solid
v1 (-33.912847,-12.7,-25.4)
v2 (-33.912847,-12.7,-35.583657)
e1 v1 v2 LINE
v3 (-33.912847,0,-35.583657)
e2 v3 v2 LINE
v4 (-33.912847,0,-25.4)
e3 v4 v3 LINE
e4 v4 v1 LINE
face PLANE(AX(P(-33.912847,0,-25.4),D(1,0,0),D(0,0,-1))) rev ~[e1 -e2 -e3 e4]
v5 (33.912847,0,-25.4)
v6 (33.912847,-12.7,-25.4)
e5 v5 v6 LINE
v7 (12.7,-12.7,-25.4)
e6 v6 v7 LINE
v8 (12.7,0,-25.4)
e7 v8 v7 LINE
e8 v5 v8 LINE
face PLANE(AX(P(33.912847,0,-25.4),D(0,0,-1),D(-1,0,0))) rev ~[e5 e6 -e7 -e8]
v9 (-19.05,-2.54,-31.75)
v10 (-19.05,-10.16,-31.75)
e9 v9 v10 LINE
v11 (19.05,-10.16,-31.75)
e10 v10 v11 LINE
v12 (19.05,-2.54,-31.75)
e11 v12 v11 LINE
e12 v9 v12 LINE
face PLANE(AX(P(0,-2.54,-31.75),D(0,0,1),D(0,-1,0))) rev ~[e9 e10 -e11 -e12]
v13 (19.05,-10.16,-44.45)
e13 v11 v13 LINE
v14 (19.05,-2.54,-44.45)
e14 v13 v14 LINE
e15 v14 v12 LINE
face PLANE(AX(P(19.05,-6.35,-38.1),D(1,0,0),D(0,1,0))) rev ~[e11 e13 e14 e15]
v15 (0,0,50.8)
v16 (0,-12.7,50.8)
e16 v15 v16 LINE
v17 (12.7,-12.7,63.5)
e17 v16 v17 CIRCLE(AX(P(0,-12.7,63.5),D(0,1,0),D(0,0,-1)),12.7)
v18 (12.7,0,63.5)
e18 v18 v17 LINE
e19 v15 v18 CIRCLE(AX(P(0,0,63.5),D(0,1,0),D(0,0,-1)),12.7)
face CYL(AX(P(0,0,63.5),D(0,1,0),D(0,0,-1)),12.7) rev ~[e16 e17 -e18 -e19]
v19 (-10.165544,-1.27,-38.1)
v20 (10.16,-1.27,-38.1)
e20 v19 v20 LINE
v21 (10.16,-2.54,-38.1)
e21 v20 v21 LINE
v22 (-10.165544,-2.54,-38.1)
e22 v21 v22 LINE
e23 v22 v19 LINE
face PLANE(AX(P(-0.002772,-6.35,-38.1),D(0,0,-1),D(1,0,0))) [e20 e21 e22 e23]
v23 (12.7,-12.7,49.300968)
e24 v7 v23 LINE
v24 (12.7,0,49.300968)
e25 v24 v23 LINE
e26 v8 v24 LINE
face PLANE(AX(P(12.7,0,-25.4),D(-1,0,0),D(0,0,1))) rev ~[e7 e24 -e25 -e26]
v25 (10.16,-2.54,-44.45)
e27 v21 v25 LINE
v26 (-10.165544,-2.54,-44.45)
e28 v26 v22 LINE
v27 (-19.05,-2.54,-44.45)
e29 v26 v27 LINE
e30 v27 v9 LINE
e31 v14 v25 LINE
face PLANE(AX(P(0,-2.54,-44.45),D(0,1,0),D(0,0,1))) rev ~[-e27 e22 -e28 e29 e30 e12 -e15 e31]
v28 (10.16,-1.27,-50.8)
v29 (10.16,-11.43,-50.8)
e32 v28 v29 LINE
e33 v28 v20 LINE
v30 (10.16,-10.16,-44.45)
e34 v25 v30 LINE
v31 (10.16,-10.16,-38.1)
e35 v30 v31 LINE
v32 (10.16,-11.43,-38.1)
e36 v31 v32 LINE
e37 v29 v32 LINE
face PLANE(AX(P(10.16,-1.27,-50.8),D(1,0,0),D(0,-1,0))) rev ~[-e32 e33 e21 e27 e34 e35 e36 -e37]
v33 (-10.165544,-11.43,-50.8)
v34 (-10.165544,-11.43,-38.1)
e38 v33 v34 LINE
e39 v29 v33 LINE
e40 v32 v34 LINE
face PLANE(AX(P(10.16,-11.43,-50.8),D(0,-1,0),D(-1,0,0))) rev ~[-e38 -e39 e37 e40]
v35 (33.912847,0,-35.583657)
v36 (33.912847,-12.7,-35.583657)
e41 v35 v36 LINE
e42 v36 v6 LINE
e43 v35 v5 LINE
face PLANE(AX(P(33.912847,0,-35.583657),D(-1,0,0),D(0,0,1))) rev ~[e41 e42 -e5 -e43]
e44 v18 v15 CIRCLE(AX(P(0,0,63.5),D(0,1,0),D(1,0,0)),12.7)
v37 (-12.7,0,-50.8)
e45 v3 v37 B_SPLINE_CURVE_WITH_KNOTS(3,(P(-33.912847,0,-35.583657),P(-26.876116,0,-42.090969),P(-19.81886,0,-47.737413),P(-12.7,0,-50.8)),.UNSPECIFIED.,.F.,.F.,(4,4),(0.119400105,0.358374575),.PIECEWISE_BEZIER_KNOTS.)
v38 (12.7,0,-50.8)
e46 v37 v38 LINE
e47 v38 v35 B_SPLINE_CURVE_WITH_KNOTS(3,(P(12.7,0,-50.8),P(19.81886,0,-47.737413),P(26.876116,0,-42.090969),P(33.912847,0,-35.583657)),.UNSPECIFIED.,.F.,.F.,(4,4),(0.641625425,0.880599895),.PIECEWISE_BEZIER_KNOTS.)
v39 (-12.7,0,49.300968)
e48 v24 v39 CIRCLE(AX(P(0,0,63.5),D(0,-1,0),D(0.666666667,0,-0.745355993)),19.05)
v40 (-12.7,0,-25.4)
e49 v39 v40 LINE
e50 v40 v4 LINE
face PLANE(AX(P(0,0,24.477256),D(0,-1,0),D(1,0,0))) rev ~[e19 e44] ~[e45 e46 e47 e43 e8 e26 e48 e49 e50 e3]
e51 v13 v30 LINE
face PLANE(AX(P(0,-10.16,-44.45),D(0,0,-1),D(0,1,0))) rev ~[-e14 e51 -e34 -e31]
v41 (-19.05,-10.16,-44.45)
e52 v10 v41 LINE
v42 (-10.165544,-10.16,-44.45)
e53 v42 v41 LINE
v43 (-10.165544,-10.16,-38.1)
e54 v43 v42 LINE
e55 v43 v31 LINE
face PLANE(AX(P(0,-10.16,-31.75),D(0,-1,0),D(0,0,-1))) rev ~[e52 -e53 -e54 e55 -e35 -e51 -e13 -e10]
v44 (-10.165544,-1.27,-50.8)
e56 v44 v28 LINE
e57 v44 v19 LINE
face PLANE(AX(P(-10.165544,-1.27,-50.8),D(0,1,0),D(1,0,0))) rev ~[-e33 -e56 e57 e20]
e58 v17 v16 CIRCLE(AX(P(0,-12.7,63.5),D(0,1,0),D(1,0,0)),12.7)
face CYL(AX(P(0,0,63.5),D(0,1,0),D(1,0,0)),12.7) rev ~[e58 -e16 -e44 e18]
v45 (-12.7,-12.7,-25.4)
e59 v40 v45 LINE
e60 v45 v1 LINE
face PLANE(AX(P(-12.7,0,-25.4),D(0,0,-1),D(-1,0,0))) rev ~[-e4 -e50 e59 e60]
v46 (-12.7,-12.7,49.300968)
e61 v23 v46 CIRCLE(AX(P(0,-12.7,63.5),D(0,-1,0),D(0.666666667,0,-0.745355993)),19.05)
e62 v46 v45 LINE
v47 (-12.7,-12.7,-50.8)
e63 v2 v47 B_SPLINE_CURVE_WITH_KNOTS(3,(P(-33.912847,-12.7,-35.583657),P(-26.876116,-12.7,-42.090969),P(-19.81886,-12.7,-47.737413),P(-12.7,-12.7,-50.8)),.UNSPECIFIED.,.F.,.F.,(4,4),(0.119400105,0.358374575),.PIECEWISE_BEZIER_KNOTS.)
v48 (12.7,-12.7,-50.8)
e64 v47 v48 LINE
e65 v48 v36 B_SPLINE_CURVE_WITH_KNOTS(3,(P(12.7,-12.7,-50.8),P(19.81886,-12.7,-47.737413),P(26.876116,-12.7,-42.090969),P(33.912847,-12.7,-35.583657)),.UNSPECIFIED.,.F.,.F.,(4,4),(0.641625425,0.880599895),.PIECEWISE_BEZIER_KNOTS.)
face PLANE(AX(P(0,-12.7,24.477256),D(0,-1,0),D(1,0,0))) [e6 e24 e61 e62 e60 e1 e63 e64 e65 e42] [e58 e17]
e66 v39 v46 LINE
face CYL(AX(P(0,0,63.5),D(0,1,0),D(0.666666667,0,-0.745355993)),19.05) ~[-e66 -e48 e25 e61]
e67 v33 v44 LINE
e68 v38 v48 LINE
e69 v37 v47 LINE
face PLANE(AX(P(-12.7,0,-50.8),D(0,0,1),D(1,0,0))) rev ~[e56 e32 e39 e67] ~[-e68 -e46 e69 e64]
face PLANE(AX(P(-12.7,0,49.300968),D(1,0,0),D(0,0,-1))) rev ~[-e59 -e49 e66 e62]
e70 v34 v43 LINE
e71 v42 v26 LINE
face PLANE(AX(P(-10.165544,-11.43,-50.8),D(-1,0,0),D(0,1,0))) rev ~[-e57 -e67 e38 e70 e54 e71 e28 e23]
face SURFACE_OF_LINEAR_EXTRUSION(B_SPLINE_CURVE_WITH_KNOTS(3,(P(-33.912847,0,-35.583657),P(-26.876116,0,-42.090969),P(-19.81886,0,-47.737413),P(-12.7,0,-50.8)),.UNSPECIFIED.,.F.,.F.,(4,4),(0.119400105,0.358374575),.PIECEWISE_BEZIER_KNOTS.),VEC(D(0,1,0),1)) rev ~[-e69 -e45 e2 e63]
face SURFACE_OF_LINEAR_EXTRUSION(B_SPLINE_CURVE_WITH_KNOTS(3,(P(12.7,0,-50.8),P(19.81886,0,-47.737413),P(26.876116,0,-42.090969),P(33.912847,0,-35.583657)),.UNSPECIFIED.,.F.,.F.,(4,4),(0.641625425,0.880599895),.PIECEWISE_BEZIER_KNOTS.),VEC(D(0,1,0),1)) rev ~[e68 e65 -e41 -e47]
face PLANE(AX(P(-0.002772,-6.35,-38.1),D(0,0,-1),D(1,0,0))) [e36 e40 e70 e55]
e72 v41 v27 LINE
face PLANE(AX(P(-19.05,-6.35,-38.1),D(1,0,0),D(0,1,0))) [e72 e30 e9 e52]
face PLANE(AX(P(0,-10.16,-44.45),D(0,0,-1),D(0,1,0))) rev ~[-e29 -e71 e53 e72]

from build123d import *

# Parameters (mm, degrees)
F1_DEPTH      = 12.7
F3_DEPTH      = 19.05
F3_DEPTH_BACK = 19.05
F5_DEPTH      = 12.7


# Not quite as in the source:
# - a feature names something its author has since deleted; it is built from what else it names


with BuildPart() as f1:
    # F0 (on Front) → F1 (new body)
    with BuildSketch(Plane.XZ):
        with BuildLine():
            Line((-12.7, 0), (0, 0))
            Line((0, 0), (12.7, 0))
            Line((12.7, 0), (12.7, 49.3009683429))
            ThreePointArc((12.7, 49.3009683429), (0, 44.45), (-12.7, 49.3009683429))
            Line((-12.7, 49.3009683429), (-12.7, 0))
        make_face()
        Polygon((12.7, 0), (0, 0), (-12.7, 0), (-12.7, -25.4), (0, -25.4), (12.7, -25.4), align=None)
        with BuildLine():
            ThreePointArc((-12.7, 49.3009683429), (0, 44.45), (12.7, 49.3009683429))
            Line((12.7, 49.3009683429), (12.7, 50.8))
            Line((12.7, 50.8), (0, 50.8))
            Line((0, 50.8), (-12.7, 50.8))
            Line((-12.7, 50.8), (-12.7, 49.3009683429))
        make_face()
        with BuildLine():
            Line((12.7, 50.8), (12.7, 49.3009683429))
            ThreePointArc((12.7, 49.3009683429), (17.3901912008, 55.7228700667), (19.05, 63.5))
            ThreePointArc((19.05, 63.5), (13.4703841816, 76.9703841816), (0, 82.55))
            ThreePointArc((0, 82.55), (-17.7959834382, 70.2974608102), (-12.7, 49.3009683429))
            Line((-12.7, 49.3009683429), (-12.7, 50.8))
            Line((-12.7, 50.8), (0, 50.8))
            Line((0, 50.8), (12.7, 50.8))
        make_face()
        with BuildLine():
            ThreePointArc((12.7, 63.5), (8.9802561211, 54.5197438789), (0, 50.8))
            ThreePointArc((0, 50.8), (-8.9802561211, 72.4802561211), (12.7, 63.5))
        make_face(mode=Mode.SUBTRACT)
        with BuildLine():
            Line((33.9128470637, -25.4), (12.7, -25.4))
            Line((12.7, -25.4), (12.7, -50.8))
            add(Edge.make_bspline(
                [(12.7, -50.8), (19.8188597647, -47.7374133591), (26.8761157229, -42.0909685678), (33.9128470637, -35.5836565254)],
                knots=[0.6416254251, 0.6416254251, 0.6416254251, 0.6416254251, 0.8805998947, 0.8805998947, 0.8805998947, 0.8805998947], degree=3))
            Line((33.9128470637, -35.5836565254), (33.9128470637, -25.4))
        make_face()
        Polygon((12.7, -50.8), (12.7, -25.4), (0, -25.4), (-12.7, -25.4), (-12.7, -50.8), align=None)
        with BuildLine():
            Line((-12.7, -50.8), (-12.7, -25.4))
            Line((-12.7, -25.4), (-33.9128470637, -25.4))
            Line((-33.9128470637, -25.4), (-33.9128470637, -35.5836565254))
            add(Edge.make_bspline(
                [(-33.9128470637, -35.5836565254), (-26.8761157229, -42.0909685678), (-19.8188597647, -47.7374133591), (-12.7, -50.8)],
                knots=[0.1194001053, 0.1194001053, 0.1194001053, 0.1194001053, 0.3583745749, 0.3583745749, 0.3583745749, 0.3583745749], degree=3))
        make_face()
    extrude(amount=F1_DEPTH)

    # F2 (on Right) → F3 (cut, two sides)
    with BuildSketch(Plane.YZ) as f3_sk:
        Polygon((-7.62, -31.75), (-10.16, -31.75), (-10.16, -44.45), (-5.08, -44.45), (-2.54, -44.45), (-2.54, -31.75), (-5.08, -31.75), align=None)
    extrude(amount=-F3_DEPTH, mode=Mode.SUBTRACT)
    extrude(f3_sk.sketch, amount=F3_DEPTH_BACK, mode=Mode.SUBTRACT)

    # F4 (on face) → F5 (cut)
    with BuildSketch(Plane(origin=(0, 0, -50.8), x_dir=(1, 0, 0), z_dir=(0, 0, -1))):
        Polygon((-10.1655442268, 1.27), (0, 1.27), (10.16, 1.27), (10.16, 11.43), (0, 11.43), (-10.1655442268, 11.43), align=None)
    extrude(amount=-F5_DEPTH, mode=Mode.SUBTRACT)


solid = f1.part
